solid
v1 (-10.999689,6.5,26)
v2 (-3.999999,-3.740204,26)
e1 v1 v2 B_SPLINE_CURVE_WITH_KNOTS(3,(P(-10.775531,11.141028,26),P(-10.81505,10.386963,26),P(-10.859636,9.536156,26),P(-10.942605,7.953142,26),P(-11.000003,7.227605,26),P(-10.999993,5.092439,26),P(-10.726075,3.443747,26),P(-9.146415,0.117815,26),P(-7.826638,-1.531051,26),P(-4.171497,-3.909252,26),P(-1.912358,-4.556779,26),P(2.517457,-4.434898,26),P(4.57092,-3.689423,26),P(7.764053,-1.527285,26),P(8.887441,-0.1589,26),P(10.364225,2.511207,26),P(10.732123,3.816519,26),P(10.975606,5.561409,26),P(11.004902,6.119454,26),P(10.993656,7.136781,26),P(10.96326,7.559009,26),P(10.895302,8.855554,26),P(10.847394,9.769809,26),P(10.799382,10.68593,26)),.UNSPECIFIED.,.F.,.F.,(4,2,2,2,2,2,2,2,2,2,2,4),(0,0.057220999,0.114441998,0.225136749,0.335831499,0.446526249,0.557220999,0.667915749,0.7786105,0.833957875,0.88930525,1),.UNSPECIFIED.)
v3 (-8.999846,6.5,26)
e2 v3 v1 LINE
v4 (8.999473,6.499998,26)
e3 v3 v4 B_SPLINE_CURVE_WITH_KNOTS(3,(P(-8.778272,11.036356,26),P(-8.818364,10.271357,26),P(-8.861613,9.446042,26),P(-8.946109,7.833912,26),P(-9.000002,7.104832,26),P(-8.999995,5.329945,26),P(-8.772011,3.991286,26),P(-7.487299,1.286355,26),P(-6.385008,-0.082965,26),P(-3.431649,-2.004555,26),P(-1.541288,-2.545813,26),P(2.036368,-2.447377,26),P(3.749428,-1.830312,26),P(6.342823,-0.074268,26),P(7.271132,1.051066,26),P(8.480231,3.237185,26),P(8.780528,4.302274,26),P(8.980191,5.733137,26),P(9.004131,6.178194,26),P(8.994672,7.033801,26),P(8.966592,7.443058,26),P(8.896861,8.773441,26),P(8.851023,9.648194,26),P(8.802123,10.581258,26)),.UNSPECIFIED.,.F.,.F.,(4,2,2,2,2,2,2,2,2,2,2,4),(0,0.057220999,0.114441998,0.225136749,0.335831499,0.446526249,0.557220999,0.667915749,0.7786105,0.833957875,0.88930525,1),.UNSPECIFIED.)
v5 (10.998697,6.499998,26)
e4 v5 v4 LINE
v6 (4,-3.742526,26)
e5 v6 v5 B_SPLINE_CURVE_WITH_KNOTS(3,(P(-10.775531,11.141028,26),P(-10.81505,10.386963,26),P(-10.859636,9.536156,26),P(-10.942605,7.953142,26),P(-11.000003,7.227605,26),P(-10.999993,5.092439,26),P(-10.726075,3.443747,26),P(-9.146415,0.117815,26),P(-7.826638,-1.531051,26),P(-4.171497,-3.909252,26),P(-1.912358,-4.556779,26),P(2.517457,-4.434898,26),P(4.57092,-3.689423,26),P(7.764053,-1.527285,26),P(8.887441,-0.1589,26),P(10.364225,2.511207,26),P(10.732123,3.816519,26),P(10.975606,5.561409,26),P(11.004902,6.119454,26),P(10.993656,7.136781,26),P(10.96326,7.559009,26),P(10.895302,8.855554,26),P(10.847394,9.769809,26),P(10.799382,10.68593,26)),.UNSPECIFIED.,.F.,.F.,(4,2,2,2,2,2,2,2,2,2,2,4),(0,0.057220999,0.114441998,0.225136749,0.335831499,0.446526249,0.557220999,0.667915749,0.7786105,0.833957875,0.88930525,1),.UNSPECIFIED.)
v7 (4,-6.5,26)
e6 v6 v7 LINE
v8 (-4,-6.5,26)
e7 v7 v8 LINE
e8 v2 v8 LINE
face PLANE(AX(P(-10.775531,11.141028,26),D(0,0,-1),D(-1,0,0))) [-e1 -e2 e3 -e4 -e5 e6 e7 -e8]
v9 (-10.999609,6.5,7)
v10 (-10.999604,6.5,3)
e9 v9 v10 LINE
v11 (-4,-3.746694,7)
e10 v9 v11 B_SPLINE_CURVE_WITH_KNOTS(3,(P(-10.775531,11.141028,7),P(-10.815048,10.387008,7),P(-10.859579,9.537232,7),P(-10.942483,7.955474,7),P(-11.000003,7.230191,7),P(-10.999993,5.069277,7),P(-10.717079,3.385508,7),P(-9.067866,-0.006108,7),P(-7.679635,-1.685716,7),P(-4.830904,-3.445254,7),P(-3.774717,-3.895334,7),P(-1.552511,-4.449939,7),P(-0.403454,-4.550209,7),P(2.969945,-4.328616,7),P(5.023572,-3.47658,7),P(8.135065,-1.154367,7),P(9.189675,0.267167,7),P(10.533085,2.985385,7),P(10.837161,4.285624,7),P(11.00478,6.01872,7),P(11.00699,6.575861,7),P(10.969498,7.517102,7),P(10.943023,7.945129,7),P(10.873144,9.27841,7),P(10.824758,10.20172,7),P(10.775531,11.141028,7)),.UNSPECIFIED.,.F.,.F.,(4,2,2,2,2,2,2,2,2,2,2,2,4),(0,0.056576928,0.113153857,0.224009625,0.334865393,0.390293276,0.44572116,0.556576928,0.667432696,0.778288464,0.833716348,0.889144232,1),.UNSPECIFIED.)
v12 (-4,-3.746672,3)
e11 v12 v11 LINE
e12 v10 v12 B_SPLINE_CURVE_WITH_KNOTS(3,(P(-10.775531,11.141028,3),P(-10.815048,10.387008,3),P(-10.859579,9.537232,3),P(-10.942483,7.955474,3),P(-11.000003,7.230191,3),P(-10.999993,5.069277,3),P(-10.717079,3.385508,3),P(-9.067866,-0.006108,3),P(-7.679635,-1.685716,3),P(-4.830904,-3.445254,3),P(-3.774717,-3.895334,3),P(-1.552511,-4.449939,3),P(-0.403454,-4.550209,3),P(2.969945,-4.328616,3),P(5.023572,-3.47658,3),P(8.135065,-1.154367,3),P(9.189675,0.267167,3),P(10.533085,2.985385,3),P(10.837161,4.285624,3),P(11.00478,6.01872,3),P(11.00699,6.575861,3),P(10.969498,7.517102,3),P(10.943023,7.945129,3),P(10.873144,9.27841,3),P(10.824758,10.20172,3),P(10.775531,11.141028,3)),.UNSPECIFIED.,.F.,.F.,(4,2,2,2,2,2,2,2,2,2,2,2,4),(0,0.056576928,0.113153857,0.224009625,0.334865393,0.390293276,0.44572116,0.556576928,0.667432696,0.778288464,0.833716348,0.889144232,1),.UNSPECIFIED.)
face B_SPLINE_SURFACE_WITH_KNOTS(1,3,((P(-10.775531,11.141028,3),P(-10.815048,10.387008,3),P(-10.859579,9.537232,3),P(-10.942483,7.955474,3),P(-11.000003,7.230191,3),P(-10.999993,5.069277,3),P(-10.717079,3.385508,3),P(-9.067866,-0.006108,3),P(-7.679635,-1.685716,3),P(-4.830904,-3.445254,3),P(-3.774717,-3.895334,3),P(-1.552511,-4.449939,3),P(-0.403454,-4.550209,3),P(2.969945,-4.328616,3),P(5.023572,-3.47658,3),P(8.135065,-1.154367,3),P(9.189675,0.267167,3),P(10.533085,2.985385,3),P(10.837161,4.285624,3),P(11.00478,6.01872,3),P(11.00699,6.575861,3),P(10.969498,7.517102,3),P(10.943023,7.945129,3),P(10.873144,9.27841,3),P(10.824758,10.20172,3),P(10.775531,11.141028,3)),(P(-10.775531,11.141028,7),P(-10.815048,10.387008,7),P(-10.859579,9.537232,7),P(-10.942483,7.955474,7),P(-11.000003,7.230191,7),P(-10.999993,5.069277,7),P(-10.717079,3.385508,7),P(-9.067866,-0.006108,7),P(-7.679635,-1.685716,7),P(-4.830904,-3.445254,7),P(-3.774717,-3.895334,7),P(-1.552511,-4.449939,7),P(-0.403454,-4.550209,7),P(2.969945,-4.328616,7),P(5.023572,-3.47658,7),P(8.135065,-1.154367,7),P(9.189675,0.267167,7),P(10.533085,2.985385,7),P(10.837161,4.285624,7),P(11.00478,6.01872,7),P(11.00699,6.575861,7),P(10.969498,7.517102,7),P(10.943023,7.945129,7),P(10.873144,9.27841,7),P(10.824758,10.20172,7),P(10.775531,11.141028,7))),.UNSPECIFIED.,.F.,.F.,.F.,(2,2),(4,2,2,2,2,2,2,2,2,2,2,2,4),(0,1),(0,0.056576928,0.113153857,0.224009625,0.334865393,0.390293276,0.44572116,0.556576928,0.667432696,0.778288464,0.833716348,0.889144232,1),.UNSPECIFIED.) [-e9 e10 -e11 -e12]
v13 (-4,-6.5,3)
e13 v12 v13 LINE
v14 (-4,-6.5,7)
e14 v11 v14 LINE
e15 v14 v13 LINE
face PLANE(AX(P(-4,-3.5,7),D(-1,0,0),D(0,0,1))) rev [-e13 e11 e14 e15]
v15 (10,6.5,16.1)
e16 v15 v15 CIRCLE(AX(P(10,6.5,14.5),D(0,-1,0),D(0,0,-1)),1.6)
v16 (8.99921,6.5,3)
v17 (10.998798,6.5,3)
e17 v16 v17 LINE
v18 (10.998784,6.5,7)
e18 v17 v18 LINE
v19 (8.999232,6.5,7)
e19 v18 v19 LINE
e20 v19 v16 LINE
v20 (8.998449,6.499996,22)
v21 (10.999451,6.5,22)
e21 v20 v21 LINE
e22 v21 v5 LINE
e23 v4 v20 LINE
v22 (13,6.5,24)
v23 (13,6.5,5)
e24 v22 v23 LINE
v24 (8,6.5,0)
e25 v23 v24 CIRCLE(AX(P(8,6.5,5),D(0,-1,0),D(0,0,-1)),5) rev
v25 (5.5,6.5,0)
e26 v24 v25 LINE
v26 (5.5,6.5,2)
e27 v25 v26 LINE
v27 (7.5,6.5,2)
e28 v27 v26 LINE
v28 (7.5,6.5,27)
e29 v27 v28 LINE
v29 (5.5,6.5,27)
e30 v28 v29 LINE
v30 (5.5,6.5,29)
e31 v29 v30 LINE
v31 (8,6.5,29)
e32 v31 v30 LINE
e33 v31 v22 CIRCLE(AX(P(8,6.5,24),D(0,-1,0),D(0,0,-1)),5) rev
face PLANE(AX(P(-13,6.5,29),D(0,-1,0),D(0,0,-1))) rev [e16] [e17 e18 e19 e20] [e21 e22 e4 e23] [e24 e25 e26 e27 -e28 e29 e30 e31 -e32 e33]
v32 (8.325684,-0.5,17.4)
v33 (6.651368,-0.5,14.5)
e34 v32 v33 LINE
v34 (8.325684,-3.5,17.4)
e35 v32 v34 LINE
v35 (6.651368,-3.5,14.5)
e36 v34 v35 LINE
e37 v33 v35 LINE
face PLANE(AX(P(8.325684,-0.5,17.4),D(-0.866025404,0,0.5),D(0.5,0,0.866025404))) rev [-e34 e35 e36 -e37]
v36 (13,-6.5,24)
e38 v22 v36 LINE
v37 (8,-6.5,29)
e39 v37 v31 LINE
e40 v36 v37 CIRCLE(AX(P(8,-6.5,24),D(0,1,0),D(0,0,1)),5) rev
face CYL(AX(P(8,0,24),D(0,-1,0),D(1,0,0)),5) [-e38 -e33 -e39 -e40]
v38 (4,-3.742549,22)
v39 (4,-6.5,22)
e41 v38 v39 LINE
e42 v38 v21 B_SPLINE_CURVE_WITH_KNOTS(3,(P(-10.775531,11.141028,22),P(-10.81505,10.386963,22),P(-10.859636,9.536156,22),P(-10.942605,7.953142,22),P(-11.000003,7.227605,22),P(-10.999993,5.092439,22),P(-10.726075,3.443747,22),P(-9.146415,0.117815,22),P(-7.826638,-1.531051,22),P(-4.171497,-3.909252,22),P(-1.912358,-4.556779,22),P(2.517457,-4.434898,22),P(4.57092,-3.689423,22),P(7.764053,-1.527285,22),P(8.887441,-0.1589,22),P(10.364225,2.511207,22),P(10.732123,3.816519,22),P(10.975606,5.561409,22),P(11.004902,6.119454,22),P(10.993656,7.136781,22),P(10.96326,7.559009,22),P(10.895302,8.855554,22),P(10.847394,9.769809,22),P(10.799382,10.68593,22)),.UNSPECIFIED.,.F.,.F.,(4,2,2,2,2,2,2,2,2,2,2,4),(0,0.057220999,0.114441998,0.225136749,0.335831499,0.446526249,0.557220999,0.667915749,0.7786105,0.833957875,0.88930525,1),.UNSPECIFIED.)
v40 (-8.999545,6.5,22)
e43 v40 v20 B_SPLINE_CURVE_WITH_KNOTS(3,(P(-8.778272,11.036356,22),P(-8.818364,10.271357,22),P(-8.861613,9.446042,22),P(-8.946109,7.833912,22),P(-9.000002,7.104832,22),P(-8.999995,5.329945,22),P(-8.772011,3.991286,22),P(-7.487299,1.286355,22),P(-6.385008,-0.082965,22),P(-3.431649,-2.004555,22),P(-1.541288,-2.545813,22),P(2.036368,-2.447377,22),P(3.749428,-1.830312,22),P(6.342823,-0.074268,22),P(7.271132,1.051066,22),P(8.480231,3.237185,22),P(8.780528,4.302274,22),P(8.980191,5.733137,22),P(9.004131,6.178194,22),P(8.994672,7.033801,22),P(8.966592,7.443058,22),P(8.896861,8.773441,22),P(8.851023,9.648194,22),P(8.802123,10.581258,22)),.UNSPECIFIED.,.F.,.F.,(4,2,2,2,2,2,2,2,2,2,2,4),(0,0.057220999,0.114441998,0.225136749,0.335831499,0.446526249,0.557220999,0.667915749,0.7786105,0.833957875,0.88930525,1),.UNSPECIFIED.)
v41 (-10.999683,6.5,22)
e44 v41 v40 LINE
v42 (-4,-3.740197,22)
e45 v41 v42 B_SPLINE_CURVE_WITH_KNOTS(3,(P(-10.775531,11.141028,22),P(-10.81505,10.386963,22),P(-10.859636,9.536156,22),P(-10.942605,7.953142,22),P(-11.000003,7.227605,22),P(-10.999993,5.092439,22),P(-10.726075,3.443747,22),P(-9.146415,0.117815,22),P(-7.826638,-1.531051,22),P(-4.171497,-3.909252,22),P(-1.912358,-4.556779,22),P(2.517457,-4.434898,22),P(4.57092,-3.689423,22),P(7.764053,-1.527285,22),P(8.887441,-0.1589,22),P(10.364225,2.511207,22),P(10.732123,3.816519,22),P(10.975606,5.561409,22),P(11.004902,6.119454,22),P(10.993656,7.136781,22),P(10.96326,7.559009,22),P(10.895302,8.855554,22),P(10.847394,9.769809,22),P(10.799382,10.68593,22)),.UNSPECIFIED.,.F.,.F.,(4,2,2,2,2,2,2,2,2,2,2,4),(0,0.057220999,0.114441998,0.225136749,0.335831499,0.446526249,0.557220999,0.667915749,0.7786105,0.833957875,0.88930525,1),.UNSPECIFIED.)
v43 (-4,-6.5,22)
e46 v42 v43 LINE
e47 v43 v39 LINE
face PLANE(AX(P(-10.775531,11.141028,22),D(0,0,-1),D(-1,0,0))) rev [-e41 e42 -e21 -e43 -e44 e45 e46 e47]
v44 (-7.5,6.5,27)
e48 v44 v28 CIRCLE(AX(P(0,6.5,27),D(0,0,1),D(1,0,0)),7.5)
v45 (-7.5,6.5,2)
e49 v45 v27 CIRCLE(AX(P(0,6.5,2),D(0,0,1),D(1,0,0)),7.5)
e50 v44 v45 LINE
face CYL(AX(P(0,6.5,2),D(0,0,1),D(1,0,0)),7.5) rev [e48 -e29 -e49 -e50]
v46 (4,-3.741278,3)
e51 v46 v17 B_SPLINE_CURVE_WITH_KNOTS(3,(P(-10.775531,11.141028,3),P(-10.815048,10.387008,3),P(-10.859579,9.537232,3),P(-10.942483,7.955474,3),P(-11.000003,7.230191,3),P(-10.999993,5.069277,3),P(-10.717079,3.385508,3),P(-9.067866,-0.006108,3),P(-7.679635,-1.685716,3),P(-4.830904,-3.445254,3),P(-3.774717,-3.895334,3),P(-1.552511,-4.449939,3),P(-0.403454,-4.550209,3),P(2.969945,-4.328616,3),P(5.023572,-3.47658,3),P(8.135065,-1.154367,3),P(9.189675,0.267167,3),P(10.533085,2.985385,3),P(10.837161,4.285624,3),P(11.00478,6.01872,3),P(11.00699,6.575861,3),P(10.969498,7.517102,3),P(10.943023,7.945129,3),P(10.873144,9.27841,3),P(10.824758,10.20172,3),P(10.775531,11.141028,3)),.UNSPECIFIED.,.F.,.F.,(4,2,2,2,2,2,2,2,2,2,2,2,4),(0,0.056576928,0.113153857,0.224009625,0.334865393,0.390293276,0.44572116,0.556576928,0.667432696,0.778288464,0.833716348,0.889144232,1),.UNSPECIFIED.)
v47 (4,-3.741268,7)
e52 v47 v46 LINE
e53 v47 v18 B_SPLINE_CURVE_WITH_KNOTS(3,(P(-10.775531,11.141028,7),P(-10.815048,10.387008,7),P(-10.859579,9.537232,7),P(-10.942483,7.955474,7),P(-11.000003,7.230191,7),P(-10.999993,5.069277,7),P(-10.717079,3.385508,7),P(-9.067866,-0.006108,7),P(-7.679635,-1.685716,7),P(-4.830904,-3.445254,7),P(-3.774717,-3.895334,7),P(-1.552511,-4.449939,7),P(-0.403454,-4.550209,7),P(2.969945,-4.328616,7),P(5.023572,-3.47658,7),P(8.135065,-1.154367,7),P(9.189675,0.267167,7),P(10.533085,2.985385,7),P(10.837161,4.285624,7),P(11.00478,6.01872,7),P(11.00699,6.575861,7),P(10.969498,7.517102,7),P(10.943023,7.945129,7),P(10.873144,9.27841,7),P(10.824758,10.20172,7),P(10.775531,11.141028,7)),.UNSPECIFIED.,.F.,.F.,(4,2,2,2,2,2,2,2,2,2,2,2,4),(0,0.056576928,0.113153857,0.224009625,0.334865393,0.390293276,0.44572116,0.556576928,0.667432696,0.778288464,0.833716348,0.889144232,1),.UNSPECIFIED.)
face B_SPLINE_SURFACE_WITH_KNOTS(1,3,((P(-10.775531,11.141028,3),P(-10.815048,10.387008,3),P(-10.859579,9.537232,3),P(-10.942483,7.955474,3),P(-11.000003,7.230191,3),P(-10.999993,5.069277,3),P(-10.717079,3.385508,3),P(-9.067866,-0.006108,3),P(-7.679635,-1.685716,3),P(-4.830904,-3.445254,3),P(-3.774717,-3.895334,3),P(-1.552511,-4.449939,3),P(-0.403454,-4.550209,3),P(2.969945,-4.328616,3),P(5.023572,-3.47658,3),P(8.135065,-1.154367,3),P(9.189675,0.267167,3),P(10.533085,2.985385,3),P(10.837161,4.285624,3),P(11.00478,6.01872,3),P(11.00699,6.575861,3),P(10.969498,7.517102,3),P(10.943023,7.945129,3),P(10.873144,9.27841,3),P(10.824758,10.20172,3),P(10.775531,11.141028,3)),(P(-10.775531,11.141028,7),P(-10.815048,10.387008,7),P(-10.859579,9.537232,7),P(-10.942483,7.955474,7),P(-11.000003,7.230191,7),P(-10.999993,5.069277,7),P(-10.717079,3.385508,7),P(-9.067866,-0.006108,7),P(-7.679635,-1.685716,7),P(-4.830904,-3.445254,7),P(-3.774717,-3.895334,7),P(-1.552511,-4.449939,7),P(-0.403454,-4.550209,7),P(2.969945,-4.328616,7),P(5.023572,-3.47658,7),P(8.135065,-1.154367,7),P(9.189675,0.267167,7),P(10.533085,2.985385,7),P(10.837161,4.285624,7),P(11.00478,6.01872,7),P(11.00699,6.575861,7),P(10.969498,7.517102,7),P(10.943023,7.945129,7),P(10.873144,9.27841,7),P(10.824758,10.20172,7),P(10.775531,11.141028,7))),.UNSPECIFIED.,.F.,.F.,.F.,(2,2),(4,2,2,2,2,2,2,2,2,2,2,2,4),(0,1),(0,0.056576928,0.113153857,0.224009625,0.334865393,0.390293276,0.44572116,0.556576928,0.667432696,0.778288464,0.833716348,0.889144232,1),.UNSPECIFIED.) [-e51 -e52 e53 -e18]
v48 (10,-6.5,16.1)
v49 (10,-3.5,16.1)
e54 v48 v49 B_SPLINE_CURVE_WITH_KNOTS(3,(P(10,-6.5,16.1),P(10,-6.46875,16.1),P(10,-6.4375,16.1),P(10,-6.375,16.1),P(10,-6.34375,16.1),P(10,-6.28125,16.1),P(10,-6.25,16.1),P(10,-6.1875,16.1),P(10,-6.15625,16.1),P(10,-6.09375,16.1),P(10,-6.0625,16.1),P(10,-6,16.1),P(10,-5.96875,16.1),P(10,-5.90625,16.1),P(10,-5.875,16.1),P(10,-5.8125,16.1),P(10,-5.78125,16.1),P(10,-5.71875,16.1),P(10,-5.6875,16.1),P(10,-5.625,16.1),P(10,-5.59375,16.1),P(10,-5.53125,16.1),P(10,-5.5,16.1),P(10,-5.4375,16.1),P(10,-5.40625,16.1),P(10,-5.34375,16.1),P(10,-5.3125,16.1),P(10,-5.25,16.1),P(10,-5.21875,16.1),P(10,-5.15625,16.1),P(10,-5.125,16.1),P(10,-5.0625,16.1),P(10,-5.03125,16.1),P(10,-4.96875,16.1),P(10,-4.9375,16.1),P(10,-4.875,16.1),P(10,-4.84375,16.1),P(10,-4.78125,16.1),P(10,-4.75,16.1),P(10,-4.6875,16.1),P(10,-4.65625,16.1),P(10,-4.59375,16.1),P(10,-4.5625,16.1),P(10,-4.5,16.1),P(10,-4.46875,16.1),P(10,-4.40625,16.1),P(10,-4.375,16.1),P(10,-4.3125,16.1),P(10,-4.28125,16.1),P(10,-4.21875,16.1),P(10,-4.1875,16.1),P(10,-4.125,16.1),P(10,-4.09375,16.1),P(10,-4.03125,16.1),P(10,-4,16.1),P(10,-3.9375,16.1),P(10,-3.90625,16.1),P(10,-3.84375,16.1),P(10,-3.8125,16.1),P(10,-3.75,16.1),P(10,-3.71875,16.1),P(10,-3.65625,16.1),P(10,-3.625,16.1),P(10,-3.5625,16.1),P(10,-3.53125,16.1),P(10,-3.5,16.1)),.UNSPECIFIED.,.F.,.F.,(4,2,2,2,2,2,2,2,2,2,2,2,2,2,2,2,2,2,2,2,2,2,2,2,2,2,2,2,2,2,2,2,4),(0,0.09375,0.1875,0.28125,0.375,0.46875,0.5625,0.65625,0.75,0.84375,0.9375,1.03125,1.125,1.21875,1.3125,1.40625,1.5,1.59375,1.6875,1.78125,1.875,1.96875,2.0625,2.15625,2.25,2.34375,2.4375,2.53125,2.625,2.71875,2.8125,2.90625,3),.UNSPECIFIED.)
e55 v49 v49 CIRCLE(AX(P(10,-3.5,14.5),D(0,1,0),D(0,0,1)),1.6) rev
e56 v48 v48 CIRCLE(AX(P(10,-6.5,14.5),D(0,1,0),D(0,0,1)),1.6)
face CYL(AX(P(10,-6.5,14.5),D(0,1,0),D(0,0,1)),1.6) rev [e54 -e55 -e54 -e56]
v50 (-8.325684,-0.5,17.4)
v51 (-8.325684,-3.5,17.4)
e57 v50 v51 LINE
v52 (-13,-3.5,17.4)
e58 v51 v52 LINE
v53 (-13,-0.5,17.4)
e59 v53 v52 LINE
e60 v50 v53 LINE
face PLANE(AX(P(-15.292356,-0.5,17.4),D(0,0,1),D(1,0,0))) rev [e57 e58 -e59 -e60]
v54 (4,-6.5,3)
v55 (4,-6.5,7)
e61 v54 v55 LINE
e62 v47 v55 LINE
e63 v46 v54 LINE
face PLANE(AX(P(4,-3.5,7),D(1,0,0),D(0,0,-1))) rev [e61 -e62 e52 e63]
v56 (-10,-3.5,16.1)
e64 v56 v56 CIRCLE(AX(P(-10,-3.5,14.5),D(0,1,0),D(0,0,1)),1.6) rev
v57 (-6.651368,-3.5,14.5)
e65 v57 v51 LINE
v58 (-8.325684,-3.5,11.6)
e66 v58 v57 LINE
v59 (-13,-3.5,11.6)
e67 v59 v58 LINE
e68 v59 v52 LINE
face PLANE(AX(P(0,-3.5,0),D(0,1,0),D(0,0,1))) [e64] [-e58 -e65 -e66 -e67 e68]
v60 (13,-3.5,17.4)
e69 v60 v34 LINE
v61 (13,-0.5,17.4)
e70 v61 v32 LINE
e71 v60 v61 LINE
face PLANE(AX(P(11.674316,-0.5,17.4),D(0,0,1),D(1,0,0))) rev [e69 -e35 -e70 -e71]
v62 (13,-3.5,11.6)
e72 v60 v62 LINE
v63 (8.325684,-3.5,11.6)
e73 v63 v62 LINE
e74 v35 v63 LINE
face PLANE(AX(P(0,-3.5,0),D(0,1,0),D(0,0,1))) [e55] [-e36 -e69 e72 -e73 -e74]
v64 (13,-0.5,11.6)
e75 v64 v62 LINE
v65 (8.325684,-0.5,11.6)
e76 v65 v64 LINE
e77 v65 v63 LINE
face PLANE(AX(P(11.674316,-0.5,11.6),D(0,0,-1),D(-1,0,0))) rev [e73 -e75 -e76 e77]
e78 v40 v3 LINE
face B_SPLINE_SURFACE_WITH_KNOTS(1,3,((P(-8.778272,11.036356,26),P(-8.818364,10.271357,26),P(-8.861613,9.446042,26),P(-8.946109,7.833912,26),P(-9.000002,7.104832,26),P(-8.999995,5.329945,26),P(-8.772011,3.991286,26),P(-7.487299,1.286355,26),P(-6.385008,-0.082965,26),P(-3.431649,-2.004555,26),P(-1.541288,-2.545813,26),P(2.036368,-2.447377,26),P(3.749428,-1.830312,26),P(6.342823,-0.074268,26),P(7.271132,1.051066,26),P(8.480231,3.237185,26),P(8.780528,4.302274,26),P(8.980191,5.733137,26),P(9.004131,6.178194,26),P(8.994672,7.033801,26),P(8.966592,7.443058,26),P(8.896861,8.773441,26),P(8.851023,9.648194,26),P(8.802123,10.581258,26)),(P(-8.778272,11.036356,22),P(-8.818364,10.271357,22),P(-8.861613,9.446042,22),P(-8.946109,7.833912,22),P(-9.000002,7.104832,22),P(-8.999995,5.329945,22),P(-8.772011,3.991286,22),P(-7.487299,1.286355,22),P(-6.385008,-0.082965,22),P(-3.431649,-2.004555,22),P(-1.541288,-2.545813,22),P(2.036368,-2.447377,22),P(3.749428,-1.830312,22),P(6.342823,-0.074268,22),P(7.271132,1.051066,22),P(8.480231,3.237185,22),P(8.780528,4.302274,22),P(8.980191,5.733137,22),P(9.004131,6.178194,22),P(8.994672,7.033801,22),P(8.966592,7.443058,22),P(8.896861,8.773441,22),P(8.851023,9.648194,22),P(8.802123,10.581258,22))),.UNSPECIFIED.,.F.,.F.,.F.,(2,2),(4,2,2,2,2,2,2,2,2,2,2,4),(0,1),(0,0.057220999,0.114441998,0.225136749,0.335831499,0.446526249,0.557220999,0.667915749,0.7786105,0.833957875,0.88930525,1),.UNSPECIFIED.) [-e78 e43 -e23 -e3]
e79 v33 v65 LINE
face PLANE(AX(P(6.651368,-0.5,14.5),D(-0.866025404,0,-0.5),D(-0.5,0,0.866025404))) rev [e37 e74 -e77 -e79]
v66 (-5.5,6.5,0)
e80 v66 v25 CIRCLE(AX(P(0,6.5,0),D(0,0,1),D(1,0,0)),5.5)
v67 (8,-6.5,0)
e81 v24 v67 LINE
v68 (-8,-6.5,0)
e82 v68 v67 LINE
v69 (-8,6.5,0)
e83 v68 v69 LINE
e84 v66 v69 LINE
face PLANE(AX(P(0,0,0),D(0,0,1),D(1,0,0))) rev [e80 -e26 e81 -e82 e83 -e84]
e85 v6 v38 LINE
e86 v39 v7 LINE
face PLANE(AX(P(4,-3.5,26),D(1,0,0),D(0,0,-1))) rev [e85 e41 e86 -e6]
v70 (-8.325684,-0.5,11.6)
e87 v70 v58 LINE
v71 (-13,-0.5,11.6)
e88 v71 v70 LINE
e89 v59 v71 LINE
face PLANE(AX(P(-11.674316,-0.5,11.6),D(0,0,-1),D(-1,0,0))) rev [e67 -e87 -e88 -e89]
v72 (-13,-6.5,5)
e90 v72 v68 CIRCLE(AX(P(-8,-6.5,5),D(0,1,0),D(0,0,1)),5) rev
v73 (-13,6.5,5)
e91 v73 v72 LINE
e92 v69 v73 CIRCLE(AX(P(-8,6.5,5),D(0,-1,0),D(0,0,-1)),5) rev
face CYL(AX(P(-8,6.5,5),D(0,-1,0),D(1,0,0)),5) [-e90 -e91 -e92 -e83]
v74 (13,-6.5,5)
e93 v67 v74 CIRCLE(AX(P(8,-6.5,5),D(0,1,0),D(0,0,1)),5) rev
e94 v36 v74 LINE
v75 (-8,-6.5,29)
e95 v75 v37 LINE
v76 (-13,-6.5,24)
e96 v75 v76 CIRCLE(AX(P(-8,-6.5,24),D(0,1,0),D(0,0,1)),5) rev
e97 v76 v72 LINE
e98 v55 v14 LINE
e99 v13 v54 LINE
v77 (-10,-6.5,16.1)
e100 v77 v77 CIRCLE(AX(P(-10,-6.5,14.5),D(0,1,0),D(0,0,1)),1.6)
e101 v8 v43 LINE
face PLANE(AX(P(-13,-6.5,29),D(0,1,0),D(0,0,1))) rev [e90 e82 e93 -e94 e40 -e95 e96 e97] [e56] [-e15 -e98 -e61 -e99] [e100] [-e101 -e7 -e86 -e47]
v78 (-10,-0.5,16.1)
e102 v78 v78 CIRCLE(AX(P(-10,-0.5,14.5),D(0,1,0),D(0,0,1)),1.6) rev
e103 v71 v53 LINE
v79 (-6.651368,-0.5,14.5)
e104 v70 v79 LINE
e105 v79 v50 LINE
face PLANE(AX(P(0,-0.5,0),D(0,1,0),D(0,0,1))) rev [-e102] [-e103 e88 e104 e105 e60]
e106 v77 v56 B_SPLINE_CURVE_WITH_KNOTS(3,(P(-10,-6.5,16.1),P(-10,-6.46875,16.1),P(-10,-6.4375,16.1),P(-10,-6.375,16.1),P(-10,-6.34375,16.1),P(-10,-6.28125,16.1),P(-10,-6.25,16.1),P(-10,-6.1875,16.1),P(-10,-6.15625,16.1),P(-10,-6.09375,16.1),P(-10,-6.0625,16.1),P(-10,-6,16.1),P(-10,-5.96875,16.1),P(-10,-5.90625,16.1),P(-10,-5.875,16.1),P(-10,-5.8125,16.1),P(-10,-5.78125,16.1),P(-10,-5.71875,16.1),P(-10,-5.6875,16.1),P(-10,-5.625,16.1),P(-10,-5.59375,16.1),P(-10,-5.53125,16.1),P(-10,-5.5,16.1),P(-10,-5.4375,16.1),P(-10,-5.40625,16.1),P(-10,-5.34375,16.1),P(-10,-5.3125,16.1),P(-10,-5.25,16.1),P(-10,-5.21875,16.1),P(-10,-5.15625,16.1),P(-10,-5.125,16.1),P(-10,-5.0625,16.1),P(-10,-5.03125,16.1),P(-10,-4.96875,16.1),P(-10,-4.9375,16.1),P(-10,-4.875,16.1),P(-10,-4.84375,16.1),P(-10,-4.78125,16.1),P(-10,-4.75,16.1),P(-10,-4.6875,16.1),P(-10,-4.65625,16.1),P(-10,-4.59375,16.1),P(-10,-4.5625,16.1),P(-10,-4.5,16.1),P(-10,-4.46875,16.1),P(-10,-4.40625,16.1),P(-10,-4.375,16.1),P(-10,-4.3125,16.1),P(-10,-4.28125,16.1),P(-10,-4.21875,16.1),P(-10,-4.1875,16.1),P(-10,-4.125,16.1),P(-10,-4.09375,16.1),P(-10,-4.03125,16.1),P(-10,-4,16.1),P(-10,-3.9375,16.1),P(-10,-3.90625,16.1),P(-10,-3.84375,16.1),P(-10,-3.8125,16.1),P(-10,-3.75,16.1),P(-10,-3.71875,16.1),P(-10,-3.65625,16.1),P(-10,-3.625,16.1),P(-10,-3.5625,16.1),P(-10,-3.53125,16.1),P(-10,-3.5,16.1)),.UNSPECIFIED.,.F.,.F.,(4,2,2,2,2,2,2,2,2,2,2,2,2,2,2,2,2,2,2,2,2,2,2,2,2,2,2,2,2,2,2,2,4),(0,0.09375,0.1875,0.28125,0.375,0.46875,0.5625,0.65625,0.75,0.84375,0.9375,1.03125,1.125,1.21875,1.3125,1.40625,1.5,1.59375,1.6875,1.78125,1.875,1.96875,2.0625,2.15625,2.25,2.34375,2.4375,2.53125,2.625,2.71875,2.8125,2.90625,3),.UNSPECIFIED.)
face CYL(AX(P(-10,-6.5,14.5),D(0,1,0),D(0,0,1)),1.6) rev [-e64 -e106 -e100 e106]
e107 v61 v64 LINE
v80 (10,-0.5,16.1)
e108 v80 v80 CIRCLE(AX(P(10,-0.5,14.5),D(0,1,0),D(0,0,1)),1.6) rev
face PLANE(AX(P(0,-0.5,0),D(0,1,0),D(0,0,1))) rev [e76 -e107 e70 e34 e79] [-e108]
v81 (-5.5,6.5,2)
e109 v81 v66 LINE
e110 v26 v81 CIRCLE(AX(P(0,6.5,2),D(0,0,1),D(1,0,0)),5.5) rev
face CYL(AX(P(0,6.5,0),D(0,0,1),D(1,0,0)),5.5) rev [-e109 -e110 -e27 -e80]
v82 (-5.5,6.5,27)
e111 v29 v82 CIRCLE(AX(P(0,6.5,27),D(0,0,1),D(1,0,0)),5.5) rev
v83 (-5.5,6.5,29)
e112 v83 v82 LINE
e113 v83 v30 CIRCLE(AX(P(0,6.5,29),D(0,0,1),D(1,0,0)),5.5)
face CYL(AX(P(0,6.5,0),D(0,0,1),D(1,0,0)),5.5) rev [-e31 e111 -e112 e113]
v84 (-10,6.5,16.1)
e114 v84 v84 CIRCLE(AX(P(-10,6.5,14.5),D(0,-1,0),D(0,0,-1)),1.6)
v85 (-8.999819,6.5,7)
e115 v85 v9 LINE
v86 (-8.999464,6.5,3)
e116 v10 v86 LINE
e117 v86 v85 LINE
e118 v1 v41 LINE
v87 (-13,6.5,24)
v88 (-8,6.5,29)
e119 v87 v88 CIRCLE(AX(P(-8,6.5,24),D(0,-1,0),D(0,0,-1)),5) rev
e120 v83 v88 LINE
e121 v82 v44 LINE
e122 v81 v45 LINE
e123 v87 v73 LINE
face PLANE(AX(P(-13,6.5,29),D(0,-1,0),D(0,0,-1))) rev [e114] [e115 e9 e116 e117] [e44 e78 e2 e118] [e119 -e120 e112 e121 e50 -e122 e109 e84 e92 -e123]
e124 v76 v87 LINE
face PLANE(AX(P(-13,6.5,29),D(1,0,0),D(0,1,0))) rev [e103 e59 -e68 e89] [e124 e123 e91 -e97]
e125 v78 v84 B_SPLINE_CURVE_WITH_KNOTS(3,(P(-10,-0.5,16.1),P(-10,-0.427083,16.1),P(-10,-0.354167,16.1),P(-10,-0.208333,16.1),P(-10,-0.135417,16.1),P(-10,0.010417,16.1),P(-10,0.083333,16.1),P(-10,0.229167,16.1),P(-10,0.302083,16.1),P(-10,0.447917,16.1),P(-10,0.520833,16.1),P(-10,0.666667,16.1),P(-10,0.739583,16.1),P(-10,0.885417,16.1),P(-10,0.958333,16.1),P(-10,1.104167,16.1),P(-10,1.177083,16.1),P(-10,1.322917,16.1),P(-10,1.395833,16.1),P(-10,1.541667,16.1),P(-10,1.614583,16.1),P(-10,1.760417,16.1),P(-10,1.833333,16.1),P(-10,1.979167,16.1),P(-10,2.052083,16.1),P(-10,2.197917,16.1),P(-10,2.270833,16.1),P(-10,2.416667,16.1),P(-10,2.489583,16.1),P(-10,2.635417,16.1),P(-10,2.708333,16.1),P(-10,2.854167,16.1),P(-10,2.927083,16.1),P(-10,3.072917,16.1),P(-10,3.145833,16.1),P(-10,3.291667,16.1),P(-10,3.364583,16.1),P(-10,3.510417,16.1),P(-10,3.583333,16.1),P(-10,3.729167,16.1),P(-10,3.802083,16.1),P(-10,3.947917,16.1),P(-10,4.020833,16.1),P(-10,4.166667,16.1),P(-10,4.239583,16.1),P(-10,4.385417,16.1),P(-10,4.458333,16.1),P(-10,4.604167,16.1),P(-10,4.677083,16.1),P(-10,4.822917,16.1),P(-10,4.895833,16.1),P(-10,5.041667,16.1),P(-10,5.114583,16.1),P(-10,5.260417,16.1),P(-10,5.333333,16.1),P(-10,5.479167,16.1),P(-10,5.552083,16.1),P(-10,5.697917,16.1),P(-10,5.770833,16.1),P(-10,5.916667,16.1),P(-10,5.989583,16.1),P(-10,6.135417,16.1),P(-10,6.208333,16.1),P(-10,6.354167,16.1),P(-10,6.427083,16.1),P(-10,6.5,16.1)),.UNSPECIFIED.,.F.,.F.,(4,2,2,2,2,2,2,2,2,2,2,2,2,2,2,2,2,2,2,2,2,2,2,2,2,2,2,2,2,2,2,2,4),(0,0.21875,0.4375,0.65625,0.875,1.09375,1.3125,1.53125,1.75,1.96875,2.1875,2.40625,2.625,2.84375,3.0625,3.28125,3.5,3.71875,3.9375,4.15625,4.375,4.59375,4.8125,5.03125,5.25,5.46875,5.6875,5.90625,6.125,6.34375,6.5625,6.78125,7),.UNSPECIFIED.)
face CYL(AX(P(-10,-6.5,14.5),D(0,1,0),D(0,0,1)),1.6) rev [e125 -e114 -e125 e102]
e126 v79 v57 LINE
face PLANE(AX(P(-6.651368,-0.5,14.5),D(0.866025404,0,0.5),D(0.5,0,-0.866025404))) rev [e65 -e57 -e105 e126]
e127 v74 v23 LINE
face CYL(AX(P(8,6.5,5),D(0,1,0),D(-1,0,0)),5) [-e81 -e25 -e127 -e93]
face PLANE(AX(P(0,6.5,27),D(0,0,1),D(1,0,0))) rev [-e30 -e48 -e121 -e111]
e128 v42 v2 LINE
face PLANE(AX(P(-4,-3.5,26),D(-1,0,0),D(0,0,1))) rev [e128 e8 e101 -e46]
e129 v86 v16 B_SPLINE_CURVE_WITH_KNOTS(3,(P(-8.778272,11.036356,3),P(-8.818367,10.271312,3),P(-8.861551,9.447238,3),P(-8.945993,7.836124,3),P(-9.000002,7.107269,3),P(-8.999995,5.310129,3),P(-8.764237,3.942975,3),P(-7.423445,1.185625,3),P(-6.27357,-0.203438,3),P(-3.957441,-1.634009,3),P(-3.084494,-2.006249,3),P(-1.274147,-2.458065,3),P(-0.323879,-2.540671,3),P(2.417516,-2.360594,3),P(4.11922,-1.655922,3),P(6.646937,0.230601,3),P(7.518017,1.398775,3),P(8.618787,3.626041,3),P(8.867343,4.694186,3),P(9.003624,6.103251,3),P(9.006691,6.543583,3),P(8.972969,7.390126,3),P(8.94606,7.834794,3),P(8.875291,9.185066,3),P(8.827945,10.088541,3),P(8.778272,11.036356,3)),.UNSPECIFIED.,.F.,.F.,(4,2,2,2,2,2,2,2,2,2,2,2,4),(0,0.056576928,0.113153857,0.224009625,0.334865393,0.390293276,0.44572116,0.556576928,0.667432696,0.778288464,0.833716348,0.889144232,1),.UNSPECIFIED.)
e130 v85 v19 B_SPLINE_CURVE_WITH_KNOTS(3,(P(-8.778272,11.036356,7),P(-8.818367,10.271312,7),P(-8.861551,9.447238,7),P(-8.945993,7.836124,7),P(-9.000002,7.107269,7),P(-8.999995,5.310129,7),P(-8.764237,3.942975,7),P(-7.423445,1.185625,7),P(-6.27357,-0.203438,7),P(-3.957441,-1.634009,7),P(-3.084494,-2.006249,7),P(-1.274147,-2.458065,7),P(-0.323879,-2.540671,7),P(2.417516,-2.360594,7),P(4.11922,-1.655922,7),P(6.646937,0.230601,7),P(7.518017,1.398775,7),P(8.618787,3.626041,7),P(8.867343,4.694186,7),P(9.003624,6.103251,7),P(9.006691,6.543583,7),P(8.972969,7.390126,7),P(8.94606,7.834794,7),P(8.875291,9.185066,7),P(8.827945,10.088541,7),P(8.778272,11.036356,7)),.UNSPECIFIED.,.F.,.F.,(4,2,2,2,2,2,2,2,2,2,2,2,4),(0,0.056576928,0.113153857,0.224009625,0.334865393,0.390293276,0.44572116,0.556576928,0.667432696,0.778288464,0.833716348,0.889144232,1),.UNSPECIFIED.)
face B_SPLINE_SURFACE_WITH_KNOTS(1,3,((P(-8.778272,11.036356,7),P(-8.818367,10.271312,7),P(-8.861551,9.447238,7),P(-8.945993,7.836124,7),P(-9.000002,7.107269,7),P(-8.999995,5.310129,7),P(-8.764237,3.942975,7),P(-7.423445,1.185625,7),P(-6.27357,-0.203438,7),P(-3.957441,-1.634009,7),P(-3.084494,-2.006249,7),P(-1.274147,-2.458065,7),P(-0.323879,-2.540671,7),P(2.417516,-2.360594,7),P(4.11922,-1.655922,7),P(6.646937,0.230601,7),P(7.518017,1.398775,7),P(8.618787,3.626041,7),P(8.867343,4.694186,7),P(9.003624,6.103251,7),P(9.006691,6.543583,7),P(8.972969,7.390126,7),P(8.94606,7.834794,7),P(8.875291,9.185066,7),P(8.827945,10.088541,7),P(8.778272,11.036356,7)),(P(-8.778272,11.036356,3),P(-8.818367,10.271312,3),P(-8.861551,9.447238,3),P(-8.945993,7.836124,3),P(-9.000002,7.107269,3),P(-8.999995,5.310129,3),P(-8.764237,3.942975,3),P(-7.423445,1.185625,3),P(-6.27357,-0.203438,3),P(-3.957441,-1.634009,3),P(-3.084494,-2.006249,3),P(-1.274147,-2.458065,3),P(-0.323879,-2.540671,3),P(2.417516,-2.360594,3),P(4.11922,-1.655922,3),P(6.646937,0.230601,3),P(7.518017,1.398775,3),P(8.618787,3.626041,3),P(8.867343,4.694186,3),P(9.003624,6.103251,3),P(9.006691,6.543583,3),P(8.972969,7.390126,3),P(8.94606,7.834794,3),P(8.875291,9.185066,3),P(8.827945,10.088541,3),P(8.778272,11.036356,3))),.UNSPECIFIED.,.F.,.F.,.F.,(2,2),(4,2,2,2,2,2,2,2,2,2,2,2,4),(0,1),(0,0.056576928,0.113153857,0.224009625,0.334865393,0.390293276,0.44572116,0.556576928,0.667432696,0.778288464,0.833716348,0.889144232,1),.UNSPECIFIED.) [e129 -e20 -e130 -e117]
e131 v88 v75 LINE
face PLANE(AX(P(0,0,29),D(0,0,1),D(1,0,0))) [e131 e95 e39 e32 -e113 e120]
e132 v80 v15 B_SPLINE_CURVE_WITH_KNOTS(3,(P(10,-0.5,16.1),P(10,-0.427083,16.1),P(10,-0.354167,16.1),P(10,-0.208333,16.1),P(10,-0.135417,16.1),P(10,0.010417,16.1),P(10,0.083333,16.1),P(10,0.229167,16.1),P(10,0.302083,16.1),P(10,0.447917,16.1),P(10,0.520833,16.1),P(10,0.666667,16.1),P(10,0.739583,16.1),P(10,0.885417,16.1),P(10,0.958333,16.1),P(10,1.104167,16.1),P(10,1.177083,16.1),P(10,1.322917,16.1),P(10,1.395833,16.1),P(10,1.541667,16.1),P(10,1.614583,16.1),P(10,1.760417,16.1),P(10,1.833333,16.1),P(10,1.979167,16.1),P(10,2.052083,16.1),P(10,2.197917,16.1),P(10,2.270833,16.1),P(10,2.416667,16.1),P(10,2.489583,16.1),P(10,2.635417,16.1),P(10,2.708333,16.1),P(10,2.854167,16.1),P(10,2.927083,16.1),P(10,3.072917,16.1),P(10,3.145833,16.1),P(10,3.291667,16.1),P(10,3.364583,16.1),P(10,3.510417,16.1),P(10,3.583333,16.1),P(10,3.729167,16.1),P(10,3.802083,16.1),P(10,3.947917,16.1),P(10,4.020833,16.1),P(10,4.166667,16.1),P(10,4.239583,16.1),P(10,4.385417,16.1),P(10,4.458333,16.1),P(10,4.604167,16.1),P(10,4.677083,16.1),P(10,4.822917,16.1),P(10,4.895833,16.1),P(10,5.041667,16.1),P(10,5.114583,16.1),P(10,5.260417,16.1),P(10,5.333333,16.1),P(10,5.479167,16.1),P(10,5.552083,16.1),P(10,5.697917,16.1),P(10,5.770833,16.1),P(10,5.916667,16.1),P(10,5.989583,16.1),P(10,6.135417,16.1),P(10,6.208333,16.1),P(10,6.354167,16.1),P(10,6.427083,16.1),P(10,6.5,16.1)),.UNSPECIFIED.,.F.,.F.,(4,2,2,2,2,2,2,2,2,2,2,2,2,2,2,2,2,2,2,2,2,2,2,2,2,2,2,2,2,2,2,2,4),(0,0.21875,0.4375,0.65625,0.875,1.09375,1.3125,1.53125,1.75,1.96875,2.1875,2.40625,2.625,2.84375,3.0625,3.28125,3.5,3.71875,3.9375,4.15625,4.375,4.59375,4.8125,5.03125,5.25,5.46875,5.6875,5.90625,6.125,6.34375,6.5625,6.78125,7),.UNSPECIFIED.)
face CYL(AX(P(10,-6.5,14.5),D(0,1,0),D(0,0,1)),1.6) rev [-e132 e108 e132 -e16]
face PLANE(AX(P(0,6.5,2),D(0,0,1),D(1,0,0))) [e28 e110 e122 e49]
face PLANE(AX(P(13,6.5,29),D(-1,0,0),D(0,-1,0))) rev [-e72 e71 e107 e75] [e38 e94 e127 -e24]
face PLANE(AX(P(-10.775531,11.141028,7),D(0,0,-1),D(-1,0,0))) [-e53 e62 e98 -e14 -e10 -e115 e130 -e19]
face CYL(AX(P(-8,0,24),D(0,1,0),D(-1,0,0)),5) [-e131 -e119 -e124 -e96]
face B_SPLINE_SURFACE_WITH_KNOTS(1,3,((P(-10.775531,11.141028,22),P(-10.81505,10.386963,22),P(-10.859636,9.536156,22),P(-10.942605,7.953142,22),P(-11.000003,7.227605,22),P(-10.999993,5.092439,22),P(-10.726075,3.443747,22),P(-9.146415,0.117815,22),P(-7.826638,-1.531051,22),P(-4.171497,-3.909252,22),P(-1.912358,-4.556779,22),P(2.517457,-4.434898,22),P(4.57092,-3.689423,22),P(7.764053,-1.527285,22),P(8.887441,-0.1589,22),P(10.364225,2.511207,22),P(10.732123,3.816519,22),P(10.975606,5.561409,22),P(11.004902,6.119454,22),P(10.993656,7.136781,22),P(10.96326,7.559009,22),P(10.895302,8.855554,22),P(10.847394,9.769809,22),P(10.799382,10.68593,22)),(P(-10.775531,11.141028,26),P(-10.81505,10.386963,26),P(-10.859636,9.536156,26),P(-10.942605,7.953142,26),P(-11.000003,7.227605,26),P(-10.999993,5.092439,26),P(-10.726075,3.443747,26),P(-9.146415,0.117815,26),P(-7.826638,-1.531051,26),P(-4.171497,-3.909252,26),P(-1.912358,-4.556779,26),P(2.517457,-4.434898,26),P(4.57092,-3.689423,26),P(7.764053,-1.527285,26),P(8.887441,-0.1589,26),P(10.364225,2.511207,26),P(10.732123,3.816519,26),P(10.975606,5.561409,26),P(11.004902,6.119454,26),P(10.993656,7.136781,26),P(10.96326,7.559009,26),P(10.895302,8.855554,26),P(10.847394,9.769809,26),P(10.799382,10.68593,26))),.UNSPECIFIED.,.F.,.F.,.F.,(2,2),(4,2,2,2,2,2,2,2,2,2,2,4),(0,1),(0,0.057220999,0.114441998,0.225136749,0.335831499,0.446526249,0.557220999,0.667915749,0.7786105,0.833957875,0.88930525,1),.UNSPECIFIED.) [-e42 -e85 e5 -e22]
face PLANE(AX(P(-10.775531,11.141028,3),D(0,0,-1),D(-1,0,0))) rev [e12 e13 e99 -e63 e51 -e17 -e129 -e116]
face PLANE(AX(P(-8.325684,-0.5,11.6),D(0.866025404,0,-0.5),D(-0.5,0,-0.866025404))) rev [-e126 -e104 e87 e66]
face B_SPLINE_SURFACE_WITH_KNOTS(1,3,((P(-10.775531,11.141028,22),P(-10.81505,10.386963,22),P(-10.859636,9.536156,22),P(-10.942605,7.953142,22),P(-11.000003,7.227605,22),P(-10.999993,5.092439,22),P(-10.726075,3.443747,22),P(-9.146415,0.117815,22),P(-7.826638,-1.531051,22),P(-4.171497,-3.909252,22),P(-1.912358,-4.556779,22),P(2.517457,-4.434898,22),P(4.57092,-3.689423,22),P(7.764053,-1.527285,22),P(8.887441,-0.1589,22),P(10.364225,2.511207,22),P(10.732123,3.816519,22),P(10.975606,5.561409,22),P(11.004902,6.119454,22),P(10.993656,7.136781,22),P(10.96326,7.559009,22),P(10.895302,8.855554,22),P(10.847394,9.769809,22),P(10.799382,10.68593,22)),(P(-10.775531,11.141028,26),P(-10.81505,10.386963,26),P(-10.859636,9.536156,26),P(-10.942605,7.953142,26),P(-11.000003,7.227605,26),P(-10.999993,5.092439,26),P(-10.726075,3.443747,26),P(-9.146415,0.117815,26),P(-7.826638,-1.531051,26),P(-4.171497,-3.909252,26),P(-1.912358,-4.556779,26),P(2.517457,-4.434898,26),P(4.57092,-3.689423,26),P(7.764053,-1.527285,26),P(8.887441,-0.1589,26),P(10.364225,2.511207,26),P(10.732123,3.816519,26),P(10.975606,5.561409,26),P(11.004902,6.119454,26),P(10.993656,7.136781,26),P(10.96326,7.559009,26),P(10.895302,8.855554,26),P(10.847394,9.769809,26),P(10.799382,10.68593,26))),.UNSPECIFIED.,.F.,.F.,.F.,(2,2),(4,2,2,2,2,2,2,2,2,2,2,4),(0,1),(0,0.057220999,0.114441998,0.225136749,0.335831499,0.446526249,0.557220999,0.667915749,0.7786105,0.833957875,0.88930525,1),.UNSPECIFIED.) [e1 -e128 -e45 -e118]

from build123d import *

# Parameters (mm, degrees)
ESBO_O1_W                  = 26
ESBO_O1_H                  = 13
RESSALTO_EXTRUS_O1_DEPTH   = 29
CORTE_EXTRUS_O1_DEPTH      = 33.438403167
CORTE_EXTRUS_O1_DEPTH_BACK = 33.438403167
ESBO_O2_R                  = 5.5
ESBO_O3_R                  = 7.5
CORTE_EXTRUS_O2_DEPTH      = 25
CORTE_EXTRUS_O3_DEPTH      = 35.336569427
CORTE_EXTRUS_O3_DEPTH_BACK = 35.336569427
ESBO_O4_R                  = 1.6
CORTE_EXTRUS_O4_DEPTH      = 3
ESBO_O9_W                  = 8
ESBO_O9_H                  = 4
CORTE_EXTRUS_O5_DEPTH      = 3
FILETE1_R                  = 5


with BuildPart() as part:
    # Esboço1 → Ressalto-extrusão1 (new body)
    with BuildSketch(Plane.XY):
        Rectangle(ESBO_O1_W, ESBO_O1_H)
    extrude(amount=RESSALTO_EXTRUS_O1_DEPTH)

    # Esboço2 → Corte-extrusão1 (cut, two sides: drawn at the far end of the back side and taken through both)
    with BuildSketch(Plane.XY.offset(29).offset(-CORTE_EXTRUS_O1_DEPTH_BACK)):
        with Locations((0, 6.5)):
            Circle(ESBO_O2_R)
    extrude(amount=CORTE_EXTRUS_O1_DEPTH + CORTE_EXTRUS_O1_DEPTH_BACK, mode=Mode.SUBTRACT)

    # Esboço3 → Corte-extrusão2 (cut)
    with BuildSketch(Plane.XY.offset(27)):
        with Locations((0, 6.5)):
            Circle(ESBO_O3_R)
    extrude(amount=-CORTE_EXTRUS_O2_DEPTH, mode=Mode.SUBTRACT)

    # Esboço4 → Corte-extrusão3 (cut, two sides: drawn at the far end of the back side and taken through both)
    with BuildSketch(Plane(origin=(0, 6.5, 0), x_dir=(1, 0, 0), z_dir=(0, 1, 0)).offset(-CORTE_EXTRUS_O3_DEPTH_BACK)):
        with Locations(Location((-10, -14.5, 0), (0, 0, 270))):
            Circle(ESBO_O4_R)
        with Locations(Location((10, -14.5, 0), (0, 0, 270))):
            Circle(ESBO_O4_R)
    extrude(amount=CORTE_EXTRUS_O3_DEPTH + CORTE_EXTRUS_O3_DEPTH_BACK, mode=Mode.SUBTRACT)

    # Varredura de corte3: read off the stored shape, not the designer's step
    # Varredura de corte3: loft between two sections, ruled curve by curve
    varredura_de_corte3_from = [
        Edge.make_bspline([(-10.775531387, 11.14102753, 3), (-10.815047893, 10.387007675, 3), (-10.859579119, 9.537232339, 3), (-10.942482774, 7.955474229, 3), (-11.000003483, 7.230191203, 3), (-10.999993175, 5.06927711, 3), (-10.717078713, 3.385508213, 3), (-9.067866438, -0.006108266, 3), (-7.679635371, -1.685716419, 3), (-4.830903728, -3.44525385, 3), (-3.774716833, -3.895333549, 3), (-1.552511027, -4.449938605, 3), (-0.403453822, -4.550209028, 3), (2.969944564, -4.328615808, 3), (5.023571546, -3.476580102, 3), (8.13506471, -1.154366891, 3), (9.189674801, 0.267167465, 3), (10.533085234, 2.985384839, 3), (10.837160801, 4.285623822, 3), (11.004780041, 6.01871971, 3), (11.006990461, 6.575860832, 3), (10.96949773, 7.517101654, 3), (10.943022714, 7.945129378, 3), (10.873144208, 9.27841043, 3), (10.824758408, 10.201720017, 3), (10.775531387, 11.14102753, 3)], [0, 0, 0, 0, 0.056576928, 0.056576928, 0.113153857, 0.113153857, 0.224009625, 0.224009625, 0.334865393, 0.334865393, 0.390293276, 0.390293276, 0.44572116, 0.44572116, 0.556576928, 0.556576928, 0.667432696, 0.667432696, 0.778288464, 0.778288464, 0.833716348, 0.833716348, 0.889144232, 0.889144232, 1, 1, 1, 1], 3),
        Edge.make_bspline([(-8.778272317, 11.036355618, 3), (-8.818366558, 10.271311923, 3), (-8.86155068, 9.447238277, 3), (-8.945993073, 7.836124466, 3), (-9.000002401, 7.107268908, 3), (-8.999995296, 5.310128738, 3), (-8.764237068, 3.942975251, 3), (-7.423445328, 1.185624705, 3), (-6.27357029, -0.203437636, 3), (-3.957441466, -1.63400923, 3), (-3.084493861, -2.006248941, 3), (-1.274147115, -2.45806464, 3), (-0.32387933, -2.540671478, 3), (2.417516141, -2.360593842, 3), (4.119219834, -1.655921663, 3), (6.646937102, 0.230601396, 3), (7.51801706, 1.398774697, 3), (8.618786605, 3.626040825, 3), (8.867342653, 4.694186327, 3), (9.003623581, 6.103250891, 3), (9.006690622, 6.5435831, 3), (8.972969022, 7.390126226, 3), (8.946060492, 7.834793966, 3), (8.875291444, 9.185065517, 3), (8.82794518, 10.088540932, 3), (8.778272317, 11.036355618, 3)], [0, 0, 0, 0, 0.056576928, 0.056576928, 0.113153857, 0.113153857, 0.224009625, 0.224009625, 0.334865393, 0.334865393, 0.390293276, 0.390293276, 0.44572116, 0.44572116, 0.556576928, 0.556576928, 0.667432696, 0.667432696, 0.778288464, 0.778288464, 0.833716348, 0.833716348, 0.889144232, 0.889144232, 1, 1, 1, 1], 3),
        Edge.make_line((-8.778272317, 11.036355618, 3), (-10.775531387, 11.14102753, 3)),
        Edge.make_line((8.778272317, 11.036355618, 3), (10.775531387, 11.14102753, 3)),
    ]
    varredura_de_corte3_to = [
        Edge.make_bspline([(-10.775531387, 11.14102753, 7), (-10.815047893, 10.387007675, 7), (-10.859579119, 9.537232339, 7), (-10.942482774, 7.955474229, 7), (-11.000003483, 7.230191203, 7), (-10.999993175, 5.06927711, 7), (-10.717078713, 3.385508213, 7), (-9.067866438, -0.006108266, 7), (-7.679635371, -1.685716419, 7), (-4.830903728, -3.44525385, 7), (-3.774716833, -3.895333549, 7), (-1.552511027, -4.449938605, 7), (-0.403453822, -4.550209028, 7), (2.969944564, -4.328615808, 7), (5.023571546, -3.476580102, 7), (8.13506471, -1.154366891, 7), (9.189674801, 0.267167465, 7), (10.533085234, 2.985384839, 7), (10.837160801, 4.285623822, 7), (11.004780041, 6.01871971, 7), (11.006990461, 6.575860832, 7), (10.96949773, 7.517101654, 7), (10.943022714, 7.945129378, 7), (10.873144208, 9.27841043, 7), (10.824758408, 10.201720017, 7), (10.775531387, 11.14102753, 7)], [0, 0, 0, 0, 0.056576928, 0.056576928, 0.113153857, 0.113153857, 0.224009625, 0.224009625, 0.334865393, 0.334865393, 0.390293276, 0.390293276, 0.44572116, 0.44572116, 0.556576928, 0.556576928, 0.667432696, 0.667432696, 0.778288464, 0.778288464, 0.833716348, 0.833716348, 0.889144232, 0.889144232, 1, 1, 1, 1], 3),
        Edge.make_bspline([(-8.778272317, 11.036355618, 7), (-8.818366558, 10.271311923, 7), (-8.86155068, 9.447238277, 7), (-8.945993073, 7.836124466, 7), (-9.000002401, 7.107268908, 7), (-8.999995296, 5.310128738, 7), (-8.764237068, 3.942975251, 7), (-7.423445328, 1.185624705, 7), (-6.27357029, -0.203437636, 7), (-3.957441466, -1.63400923, 7), (-3.084493861, -2.006248941, 7), (-1.274147115, -2.45806464, 7), (-0.32387933, -2.540671478, 7), (2.417516141, -2.360593842, 7), (4.119219834, -1.655921663, 7), (6.646937102, 0.230601396, 7), (7.51801706, 1.398774697, 7), (8.618786605, 3.626040825, 7), (8.867342653, 4.694186327, 7), (9.003623581, 6.103250891, 7), (9.006690622, 6.5435831, 7), (8.972969022, 7.390126226, 7), (8.946060492, 7.834793966, 7), (8.875291444, 9.185065517, 7), (8.82794518, 10.088540932, 7), (8.778272317, 11.036355618, 7)], [0, 0, 0, 0, 0.056576928, 0.056576928, 0.113153857, 0.113153857, 0.224009625, 0.224009625, 0.334865393, 0.334865393, 0.390293276, 0.390293276, 0.44572116, 0.44572116, 0.556576928, 0.556576928, 0.667432696, 0.667432696, 0.778288464, 0.778288464, 0.833716348, 0.833716348, 0.889144232, 0.889144232, 1, 1, 1, 1], 3),
        Edge.make_line((-8.778272317, 11.036355618, 7), (-10.775531387, 11.14102753, 7)),
        Edge.make_line((8.778272317, 11.036355618, 7), (10.775531387, 11.14102753, 7)),
    ]
    varredura_de_corte3 = Solid(Shell([*[Face.make_surface_from_curves(varredura_de_corte3_from[k], varredura_de_corte3_to[k]) for k in range(4)], Face(Wire(varredura_de_corte3_from)), Face(Wire(varredura_de_corte3_to))]))
    add(varredura_de_corte3, mode=Mode.SUBTRACT)

    # Varredura de corte3 2: loft between two sections, ruled curve by curve
    varredura_de_corte3_2_from = [
        Edge.make_bspline([(-10.775531387, 11.14102753, 22), (-10.815050253, 10.386962648, 22), (-10.859635544, 9.536156226, 22), (-10.942604964, 7.953142141, 22), (-11.000003387, 7.227604876, 22), (-10.999993448, 5.09243912, 22), (-10.726075216, 3.44374676, 22), (-9.146415207, 0.117814577, 22), (-7.826638231, -1.531050563, 22), (-4.171497206, -3.909251659, 22), (-1.912358031, -4.556779213, 22), (2.517456834, -4.434897746, 22), (4.570919991, -3.689422793, 22), (7.764052722, -1.527285148, 22), (8.887440792, -0.158899703, 22), (10.364225069, 2.511206921, 22), (10.732123337, 3.816518914, 22), (10.975605623, 5.5614094, 22), (11.004902153, 6.119453759, 22), (10.993656399, 7.13678057, 22), (10.963259766, 7.559009248, 22), (10.895302463, 8.855554069, 22), (10.847393897, 9.769809145, 22), (10.799382035, 10.685930053, 22)], [0, 0, 0, 0, 0.057220999, 0.057220999, 0.114441998, 0.114441998, 0.225136749, 0.225136749, 0.335831499, 0.335831499, 0.446526249, 0.446526249, 0.557220999, 0.557220999, 0.667915749, 0.667915749, 0.7786105, 0.7786105, 0.833957875, 0.833957875, 0.88930525, 0.88930525, 1, 1, 1, 1], 3),
        Edge.make_bspline([(-8.778272317, 11.036355618, 22), (-8.818364203, 10.271356871, 22), (-8.861613386, 9.446042366, 22), (-8.946108983, 7.833912176, 22), (-9.000002332, 7.104831646, 22), (-8.999995488, 5.329945493, 22), (-8.772011309, 3.991285732, 22), (-7.487299037, 1.286355363, 22), (-6.385007619, -0.082964565, 22), (-3.431648648, -2.004555434, 22), (-1.541287594, -2.5458131, 22), (2.036368433, -2.447377138, 22), (3.749427608, -1.830311698, 22), (6.342822793, -0.074267526, 22), (7.271131746, 1.051066146, 22), (8.480231231, 3.237185214, 22), (8.780527991, 4.302274211, 22), (8.980191062, 5.733137414, 22), (9.004131059, 6.178194136, 22), (8.994672137, 7.033801275, 22), (8.966591972, 7.443057915, 22), (8.896860843, 8.773440999, 22), (8.851022767, 9.64819435, 22), (8.802122965, 10.58125814, 22)], [0, 0, 0, 0, 0.057220999, 0.057220999, 0.114441998, 0.114441998, 0.225136749, 0.225136749, 0.335831499, 0.335831499, 0.446526249, 0.446526249, 0.557220999, 0.557220999, 0.667915749, 0.667915749, 0.7786105, 0.7786105, 0.833957875, 0.833957875, 0.88930525, 0.88930525, 1, 1, 1, 1], 3),
        Edge.make_line((-8.778272317, 11.036355618, 22), (-10.775531387, 11.14102753, 22)),
        Edge.make_line((8.802122965, 10.58125814, 22), (10.799382035, 10.685930053, 22)),
    ]
    varredura_de_corte3_2_to = [
        Edge.make_bspline([(-10.775531387, 11.14102753, 26), (-10.815050253, 10.386962648, 26), (-10.859635544, 9.536156226, 26), (-10.942604964, 7.953142141, 26), (-11.000003387, 7.227604876, 26), (-10.999993448, 5.09243912, 26), (-10.726075216, 3.44374676, 26), (-9.146415207, 0.117814577, 26), (-7.826638231, -1.531050563, 26), (-4.171497206, -3.909251659, 26), (-1.912358031, -4.556779213, 26), (2.517456834, -4.434897746, 26), (4.570919991, -3.689422793, 26), (7.764052722, -1.527285148, 26), (8.887440792, -0.158899703, 26), (10.364225069, 2.511206921, 26), (10.732123337, 3.816518914, 26), (10.975605623, 5.5614094, 26), (11.004902153, 6.119453759, 26), (10.993656399, 7.13678057, 26), (10.963259766, 7.559009248, 26), (10.895302463, 8.855554069, 26), (10.847393897, 9.769809145, 26), (10.799382035, 10.685930053, 26)], [0, 0, 0, 0, 0.057220999, 0.057220999, 0.114441998, 0.114441998, 0.225136749, 0.225136749, 0.335831499, 0.335831499, 0.446526249, 0.446526249, 0.557220999, 0.557220999, 0.667915749, 0.667915749, 0.7786105, 0.7786105, 0.833957875, 0.833957875, 0.88930525, 0.88930525, 1, 1, 1, 1], 3),
        Edge.make_bspline([(-8.778272317, 11.036355618, 26), (-8.818364203, 10.271356871, 26), (-8.861613386, 9.446042366, 26), (-8.946108983, 7.833912176, 26), (-9.000002332, 7.104831646, 26), (-8.999995488, 5.329945493, 26), (-8.772011309, 3.991285732, 26), (-7.487299037, 1.286355363, 26), (-6.385007619, -0.082964565, 26), (-3.431648648, -2.004555434, 26), (-1.541287594, -2.5458131, 26), (2.036368433, -2.447377138, 26), (3.749427608, -1.830311698, 26), (6.342822793, -0.074267526, 26), (7.271131746, 1.051066146, 26), (8.480231231, 3.237185214, 26), (8.780527991, 4.302274211, 26), (8.980191062, 5.733137414, 26), (9.004131059, 6.178194136, 26), (8.994672137, 7.033801275, 26), (8.966591972, 7.443057915, 26), (8.896860843, 8.773440999, 26), (8.851022767, 9.64819435, 26), (8.802122965, 10.58125814, 26)], [0, 0, 0, 0, 0.057220999, 0.057220999, 0.114441998, 0.114441998, 0.225136749, 0.225136749, 0.335831499, 0.335831499, 0.446526249, 0.446526249, 0.557220999, 0.557220999, 0.667915749, 0.667915749, 0.7786105, 0.7786105, 0.833957875, 0.833957875, 0.88930525, 0.88930525, 1, 1, 1, 1], 3),
        Edge.make_line((-8.778272317, 11.036355618, 26), (-10.775531387, 11.14102753, 26)),
        Edge.make_line((8.802122965, 10.58125814, 26), (10.799382035, 10.685930053, 26)),
    ]
    varredura_de_corte3_2 = Solid(Shell([*[Face.make_surface_from_curves(varredura_de_corte3_2_from[k], varredura_de_corte3_2_to[k]) for k in range(4)], Face(Wire(varredura_de_corte3_2_from)), Face(Wire(varredura_de_corte3_2_to))]))
    add(varredura_de_corte3_2, mode=Mode.SUBTRACT)

    # Esboço8 → Corte-extrusão4 (cut)
    with BuildSketch(Plane(origin=(0, -3.5, 0), x_dir=(-1, 0, 0), z_dir=(0, -1, 0))):
        Polygon((-11.674315781, -11.6), (-15.702583778, -11.6), (-15.702583778, -17.4), (-11.674315781, -17.4), (-8.325684219, -17.4), (-6.651368439, -14.5), (-8.325684219, -11.6), align=None)
        Polygon((11.674315781, -11.6), (8.325684219, -11.6), (6.651368439, -14.5), (8.325684219, -17.4), (11.674315781, -17.4), (15.292356459, -17.4), (15.292356459, -11.6), align=None)
    extrude(amount=-CORTE_EXTRUS_O4_DEPTH, mode=Mode.SUBTRACT)

    # Esboço9 → Corte-extrusão5 (cut)
    with BuildSketch(Plane.XZ.offset(6.5)):
        with Locations((0, 24)):
            Rectangle(ESBO_O9_W, ESBO_O9_H)
        with Locations((0, 5)):
            Rectangle(ESBO_O9_W, ESBO_O9_H)
    extrude(amount=-CORTE_EXTRUS_O5_DEPTH, mode=Mode.SUBTRACT)

    # Filete1
    filete1_edges = [part.edges().sort_by_distance(p)[0] for p in [
        (-13, 0, 29),
        (13, 0, 29),
        (-13, 0, 0),
        (13, 0, 0),
    ]]
    fillet(filete1_edges, radius=FILETE1_R)


solid = part.part
